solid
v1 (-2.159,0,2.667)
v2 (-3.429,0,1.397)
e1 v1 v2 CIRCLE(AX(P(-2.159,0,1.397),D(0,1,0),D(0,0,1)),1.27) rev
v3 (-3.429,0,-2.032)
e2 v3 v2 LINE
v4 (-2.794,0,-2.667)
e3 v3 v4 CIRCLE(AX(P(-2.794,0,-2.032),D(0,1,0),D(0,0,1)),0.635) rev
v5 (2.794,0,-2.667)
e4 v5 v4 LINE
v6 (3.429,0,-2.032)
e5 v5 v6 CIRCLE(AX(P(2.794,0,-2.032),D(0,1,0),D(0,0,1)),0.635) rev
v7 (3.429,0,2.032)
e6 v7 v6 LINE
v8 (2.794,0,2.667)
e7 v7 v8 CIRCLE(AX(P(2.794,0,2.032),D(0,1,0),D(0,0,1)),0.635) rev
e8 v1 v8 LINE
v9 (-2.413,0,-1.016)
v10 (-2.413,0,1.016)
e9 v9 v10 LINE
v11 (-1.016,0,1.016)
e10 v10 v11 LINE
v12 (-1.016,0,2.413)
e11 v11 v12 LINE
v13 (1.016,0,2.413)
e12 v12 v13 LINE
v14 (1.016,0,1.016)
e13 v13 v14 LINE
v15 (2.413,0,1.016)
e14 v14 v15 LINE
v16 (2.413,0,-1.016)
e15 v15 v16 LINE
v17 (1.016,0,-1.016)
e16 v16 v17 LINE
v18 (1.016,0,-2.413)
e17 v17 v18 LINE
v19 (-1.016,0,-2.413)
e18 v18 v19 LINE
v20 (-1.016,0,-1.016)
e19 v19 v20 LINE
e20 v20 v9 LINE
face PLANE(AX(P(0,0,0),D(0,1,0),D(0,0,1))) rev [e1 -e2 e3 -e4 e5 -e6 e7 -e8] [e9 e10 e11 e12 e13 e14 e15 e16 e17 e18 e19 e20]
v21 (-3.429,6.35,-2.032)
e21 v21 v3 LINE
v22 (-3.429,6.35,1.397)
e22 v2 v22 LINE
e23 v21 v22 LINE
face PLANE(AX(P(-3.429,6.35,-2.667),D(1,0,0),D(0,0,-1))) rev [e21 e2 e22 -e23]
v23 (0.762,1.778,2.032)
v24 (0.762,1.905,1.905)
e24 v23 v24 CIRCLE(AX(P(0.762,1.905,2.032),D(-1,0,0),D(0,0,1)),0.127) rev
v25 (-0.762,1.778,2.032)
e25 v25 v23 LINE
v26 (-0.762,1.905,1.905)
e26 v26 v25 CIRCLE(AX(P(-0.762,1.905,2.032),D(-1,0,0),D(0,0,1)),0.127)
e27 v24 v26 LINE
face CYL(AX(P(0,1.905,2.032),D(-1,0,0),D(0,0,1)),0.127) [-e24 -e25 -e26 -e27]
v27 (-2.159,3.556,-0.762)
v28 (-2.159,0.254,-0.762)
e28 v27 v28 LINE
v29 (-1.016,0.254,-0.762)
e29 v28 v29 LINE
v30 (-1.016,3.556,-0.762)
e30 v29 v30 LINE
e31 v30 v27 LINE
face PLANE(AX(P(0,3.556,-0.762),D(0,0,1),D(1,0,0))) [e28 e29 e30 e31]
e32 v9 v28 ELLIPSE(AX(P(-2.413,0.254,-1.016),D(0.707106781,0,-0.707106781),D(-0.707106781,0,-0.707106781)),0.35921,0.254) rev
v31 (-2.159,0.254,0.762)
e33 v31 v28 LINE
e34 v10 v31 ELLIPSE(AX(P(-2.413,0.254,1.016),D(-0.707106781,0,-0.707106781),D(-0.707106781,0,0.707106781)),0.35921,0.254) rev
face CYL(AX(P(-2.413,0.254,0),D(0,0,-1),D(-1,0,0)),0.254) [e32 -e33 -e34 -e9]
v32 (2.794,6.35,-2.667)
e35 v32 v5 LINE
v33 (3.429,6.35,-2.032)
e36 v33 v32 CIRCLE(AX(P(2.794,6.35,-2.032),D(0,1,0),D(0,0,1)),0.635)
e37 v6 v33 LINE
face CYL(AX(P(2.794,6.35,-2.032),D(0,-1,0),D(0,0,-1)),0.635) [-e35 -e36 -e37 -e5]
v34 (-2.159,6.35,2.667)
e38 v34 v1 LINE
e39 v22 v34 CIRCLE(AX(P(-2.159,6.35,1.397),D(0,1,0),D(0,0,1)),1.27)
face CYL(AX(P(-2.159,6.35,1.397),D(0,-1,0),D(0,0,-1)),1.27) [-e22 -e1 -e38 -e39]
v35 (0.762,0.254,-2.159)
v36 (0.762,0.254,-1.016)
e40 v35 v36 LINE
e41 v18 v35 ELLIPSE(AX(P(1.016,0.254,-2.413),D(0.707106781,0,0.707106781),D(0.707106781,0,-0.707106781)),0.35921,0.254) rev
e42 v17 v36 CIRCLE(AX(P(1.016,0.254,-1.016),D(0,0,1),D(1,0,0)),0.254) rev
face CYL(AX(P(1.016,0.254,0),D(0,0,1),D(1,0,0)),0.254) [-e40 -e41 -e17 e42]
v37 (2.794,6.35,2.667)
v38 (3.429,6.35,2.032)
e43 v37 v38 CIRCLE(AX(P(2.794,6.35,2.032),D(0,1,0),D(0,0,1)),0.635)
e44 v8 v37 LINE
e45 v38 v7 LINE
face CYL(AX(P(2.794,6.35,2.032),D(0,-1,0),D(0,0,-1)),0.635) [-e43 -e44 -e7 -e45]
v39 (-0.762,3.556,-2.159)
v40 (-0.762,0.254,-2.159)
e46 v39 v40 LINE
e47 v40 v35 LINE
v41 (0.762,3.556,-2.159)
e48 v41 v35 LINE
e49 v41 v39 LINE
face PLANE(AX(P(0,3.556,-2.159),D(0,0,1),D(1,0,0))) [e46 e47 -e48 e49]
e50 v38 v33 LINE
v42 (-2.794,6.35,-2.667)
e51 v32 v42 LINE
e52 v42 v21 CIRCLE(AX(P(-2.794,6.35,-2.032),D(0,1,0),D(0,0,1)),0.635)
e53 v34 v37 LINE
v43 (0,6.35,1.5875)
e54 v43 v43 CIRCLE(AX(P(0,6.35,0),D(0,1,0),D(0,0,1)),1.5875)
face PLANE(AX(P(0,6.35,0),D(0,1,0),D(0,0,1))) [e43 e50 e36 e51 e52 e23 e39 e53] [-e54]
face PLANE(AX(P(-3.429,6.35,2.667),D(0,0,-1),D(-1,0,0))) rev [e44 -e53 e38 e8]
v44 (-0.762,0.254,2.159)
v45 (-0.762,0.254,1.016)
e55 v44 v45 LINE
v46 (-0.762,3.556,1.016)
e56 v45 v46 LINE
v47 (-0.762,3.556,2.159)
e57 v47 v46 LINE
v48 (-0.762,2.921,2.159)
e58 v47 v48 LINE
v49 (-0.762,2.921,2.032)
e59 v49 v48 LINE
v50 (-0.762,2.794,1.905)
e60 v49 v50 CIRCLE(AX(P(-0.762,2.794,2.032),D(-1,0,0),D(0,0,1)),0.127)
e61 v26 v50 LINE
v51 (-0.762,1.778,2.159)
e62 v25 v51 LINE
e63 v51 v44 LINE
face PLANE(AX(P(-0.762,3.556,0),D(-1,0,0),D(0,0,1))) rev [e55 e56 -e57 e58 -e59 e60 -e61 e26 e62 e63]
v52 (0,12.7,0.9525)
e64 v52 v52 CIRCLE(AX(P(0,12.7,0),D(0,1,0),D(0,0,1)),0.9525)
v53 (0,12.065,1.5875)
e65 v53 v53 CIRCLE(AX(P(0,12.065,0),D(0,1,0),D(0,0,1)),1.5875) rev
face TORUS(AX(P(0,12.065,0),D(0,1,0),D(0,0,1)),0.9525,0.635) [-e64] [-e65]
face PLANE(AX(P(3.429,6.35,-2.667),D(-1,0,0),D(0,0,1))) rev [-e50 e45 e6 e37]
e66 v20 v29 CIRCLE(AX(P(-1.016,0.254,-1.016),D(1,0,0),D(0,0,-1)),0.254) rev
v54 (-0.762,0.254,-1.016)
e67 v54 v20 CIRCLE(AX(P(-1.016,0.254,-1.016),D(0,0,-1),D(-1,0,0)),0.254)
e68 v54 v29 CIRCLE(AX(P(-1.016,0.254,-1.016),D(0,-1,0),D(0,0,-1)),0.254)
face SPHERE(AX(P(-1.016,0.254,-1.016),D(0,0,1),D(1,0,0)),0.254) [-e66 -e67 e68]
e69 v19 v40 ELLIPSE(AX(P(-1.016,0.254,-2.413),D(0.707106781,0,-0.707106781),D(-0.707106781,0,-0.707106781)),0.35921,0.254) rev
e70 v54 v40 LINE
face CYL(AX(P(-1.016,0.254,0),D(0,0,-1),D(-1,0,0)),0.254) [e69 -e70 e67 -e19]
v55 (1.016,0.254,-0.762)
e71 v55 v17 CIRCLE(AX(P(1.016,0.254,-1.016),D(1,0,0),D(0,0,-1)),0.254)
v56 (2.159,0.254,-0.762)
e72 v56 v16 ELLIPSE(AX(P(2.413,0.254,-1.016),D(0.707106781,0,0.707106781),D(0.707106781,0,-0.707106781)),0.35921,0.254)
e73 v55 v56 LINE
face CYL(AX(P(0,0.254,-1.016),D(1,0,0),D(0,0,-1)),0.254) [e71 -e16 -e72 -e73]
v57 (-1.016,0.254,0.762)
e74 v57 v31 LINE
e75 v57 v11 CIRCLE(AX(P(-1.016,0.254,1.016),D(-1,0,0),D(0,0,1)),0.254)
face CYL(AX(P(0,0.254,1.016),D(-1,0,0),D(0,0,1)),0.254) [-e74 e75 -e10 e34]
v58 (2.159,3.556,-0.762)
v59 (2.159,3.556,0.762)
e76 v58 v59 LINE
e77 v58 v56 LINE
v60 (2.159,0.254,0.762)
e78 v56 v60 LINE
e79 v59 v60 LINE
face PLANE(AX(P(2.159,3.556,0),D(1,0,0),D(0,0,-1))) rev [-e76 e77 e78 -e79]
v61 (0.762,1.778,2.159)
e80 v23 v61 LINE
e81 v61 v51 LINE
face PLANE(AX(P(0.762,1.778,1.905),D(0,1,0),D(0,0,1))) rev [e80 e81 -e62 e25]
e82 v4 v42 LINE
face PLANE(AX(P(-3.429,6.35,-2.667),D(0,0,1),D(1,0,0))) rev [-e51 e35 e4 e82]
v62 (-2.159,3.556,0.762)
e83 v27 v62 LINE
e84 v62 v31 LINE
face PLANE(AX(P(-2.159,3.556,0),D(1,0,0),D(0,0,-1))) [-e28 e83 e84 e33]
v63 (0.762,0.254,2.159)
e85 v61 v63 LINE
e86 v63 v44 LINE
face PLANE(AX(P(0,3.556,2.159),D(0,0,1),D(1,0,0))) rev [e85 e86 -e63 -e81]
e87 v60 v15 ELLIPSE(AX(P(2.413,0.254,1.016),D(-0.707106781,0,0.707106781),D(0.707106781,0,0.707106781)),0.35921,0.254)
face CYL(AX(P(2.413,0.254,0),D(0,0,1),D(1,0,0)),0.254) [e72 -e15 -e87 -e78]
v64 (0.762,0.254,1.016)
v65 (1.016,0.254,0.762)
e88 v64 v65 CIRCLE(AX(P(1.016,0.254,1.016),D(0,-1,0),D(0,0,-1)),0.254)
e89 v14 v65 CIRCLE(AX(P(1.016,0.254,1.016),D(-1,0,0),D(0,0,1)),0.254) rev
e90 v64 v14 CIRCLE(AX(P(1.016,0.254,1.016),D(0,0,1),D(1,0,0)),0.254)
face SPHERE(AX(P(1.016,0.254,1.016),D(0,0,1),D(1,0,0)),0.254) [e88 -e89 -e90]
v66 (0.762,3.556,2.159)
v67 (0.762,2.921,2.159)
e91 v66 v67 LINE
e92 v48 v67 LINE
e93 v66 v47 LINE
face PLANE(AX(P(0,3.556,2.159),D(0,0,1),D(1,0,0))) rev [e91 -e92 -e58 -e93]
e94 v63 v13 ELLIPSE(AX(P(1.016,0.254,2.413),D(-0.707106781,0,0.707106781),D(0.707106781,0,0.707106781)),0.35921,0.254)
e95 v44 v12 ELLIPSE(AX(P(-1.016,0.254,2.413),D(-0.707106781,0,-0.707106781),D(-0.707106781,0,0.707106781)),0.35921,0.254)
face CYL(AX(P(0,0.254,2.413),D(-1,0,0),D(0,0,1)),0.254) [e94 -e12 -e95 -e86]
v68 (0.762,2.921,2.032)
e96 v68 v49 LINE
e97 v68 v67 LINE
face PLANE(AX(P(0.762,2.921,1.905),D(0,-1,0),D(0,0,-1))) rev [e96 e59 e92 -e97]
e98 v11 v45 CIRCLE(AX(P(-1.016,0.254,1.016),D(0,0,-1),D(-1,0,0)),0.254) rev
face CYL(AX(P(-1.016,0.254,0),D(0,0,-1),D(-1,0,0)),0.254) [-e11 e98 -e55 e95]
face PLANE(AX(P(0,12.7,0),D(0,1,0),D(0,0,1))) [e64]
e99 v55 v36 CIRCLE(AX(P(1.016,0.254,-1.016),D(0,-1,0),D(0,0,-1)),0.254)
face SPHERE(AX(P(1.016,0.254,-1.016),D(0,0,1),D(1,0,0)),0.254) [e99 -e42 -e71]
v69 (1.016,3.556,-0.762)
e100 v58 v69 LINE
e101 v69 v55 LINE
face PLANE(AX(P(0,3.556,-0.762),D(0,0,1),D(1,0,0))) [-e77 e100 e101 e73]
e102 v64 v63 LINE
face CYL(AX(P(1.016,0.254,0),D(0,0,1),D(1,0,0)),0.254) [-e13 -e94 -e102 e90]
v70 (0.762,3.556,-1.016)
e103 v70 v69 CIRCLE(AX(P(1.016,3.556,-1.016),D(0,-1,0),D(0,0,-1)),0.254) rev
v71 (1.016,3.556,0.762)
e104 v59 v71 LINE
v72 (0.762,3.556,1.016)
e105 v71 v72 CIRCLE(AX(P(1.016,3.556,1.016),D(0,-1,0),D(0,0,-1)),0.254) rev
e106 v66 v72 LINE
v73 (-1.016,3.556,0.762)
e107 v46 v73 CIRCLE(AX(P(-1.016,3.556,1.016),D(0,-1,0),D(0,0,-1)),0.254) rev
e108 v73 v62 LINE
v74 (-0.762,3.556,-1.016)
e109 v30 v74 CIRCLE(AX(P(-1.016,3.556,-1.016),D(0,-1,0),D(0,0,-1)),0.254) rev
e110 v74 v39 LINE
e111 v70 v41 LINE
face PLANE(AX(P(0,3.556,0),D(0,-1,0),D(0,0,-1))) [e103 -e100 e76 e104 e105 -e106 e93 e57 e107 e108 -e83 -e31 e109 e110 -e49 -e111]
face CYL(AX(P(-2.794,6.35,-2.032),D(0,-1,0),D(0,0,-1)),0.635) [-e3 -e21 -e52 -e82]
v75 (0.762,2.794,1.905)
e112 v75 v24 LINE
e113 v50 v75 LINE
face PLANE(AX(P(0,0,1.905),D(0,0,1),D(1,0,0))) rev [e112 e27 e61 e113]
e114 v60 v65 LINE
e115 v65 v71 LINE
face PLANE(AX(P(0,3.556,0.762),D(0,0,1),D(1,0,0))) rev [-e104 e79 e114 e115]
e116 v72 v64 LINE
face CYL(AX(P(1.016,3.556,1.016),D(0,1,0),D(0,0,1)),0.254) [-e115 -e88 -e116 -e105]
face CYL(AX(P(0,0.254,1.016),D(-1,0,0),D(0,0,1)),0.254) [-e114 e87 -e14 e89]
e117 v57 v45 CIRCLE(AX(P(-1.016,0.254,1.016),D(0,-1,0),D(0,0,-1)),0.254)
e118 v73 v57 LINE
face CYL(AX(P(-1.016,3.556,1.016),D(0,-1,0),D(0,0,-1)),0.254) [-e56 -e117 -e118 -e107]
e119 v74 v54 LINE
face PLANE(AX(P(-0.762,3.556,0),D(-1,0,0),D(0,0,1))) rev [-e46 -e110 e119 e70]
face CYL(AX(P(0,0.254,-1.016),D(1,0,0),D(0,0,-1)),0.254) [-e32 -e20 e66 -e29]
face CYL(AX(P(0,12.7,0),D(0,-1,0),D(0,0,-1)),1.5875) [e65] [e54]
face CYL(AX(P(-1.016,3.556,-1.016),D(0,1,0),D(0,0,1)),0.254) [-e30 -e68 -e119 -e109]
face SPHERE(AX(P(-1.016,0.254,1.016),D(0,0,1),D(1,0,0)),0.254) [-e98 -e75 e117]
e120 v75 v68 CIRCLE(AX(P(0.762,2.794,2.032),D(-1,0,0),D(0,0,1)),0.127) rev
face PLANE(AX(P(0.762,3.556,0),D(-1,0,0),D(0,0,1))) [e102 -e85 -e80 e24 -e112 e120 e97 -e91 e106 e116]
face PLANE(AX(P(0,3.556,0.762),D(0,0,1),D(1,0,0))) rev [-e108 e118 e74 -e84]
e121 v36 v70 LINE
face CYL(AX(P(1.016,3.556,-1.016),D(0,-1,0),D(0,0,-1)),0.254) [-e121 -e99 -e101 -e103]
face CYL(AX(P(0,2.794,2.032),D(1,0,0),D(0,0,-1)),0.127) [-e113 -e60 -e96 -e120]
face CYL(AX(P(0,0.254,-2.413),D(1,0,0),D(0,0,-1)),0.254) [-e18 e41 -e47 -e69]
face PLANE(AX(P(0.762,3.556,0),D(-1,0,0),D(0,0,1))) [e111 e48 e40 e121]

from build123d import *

# Parameters (mm, degrees)
SKETCH1_W           = 6.858
SKETCH1_H           = 5.334
BOSS_EXTRUDE1_DEPTH = 6.35
SKETCH4_W           = 1.397
SKETCH4_H           = 1.524
SKETCH4_W_2         = 1.524
SKETCH4_H_2         = 1.397
CUT_EXTRUDE1_DEPTH  = 3.556
SKETCH5_W           = 1.524
SKETCH5_H           = 1.143
BOSS_EXTRUDE4_DEPTH = 0.254
FILLET1_R           = 0.127
FILLET3_R           = 0.635
FILLET4_R           = 0.254
FILLET5_R           = 0.254
FILLET6_R           = 1.27
SKETCH6_R           = 1.5875
BOSS_EXTRUDE5_DEPTH = 6.35
FILLET8_R           = 0.635


with BuildPart() as part:
    # Sketch1 → Boss-Extrude1 (new body)
    with BuildSketch(Plane(origin=(0, 0, 0), x_dir=(1, 0, 0), z_dir=(0, 1, 0))):
        Rectangle(SKETCH1_W, SKETCH1_H)
    extrude(amount=BOSS_EXTRUDE1_DEPTH)

    # Sketch4 → Cut-Extrude1 (cut)
    with BuildSketch(Plane.XZ):
        with Locations((-1.4605, 0)):
            Rectangle(SKETCH4_W, SKETCH4_H)
        Rectangle(SKETCH4_W_2, SKETCH4_H)
        with Locations((1.4605, 0)):
            Rectangle(SKETCH4_W, SKETCH4_H)
        with Locations((0, -1.4605)):
            Rectangle(SKETCH4_W_2, SKETCH4_H_2)
        with Locations((0, 1.4605)):
            Rectangle(SKETCH4_W_2, SKETCH4_H_2)
    extrude(amount=-CUT_EXTRUDE1_DEPTH, mode=Mode.SUBTRACT)

    # Sketch5 → Boss-Extrude4 (add)
    with BuildSketch(Plane(origin=(0, 0, 2.159), x_dir=(-1, 0, 0), z_dir=(0, 0, -1))):
        with Locations((0, 2.3495)):
            Rectangle(SKETCH5_W, SKETCH5_H)
    extrude(amount=BOSS_EXTRUDE4_DEPTH)

    # Fillet1
    fillet1_edges = [part.edges().sort_by_distance(p)[0] for p in [
        (0, 1.778, 1.905),
        (0, 2.921, 1.905),
    ]]
    fillet(fillet1_edges, radius=FILLET1_R)

    # Fillet3
    fillet3_edges = [part.edges().sort_by_distance(p)[0] for p in [
        (3.429, 3.175, 2.667),
        (-3.429, 3.175, -2.667),
        (3.429, 3.175, -2.667),
    ]]
    fillet(fillet3_edges, radius=FILLET3_R)

    # Fillet4
    fillet4_edges = [part.edges().sort_by_distance(p)[0] for p in [
        (-1.4605, 0, -0.762),
        (-2.159, 0, 0),
        (0.762, 0, 1.4605),
        (1.4605, 0, -0.762),
        (0.762, 0, -1.4605),
        (0, 0, -2.159),
        (-0.762, 0, -1.4605),
        (2.159, 0, 0),
        (1.4605, 0, 0.762),
        (0, 0, 2.159),
        (-0.762, 0, 1.4605),
        (-1.4605, 0, 0.762),
    ]]
    fillet(fillet4_edges, radius=FILLET4_R)

    # Fillet5
    # the kernel refuses this fillet: 0.254 mm, written as the material it takes off along each edge
    with BuildSketch(Plane(origin=(1.016, 0.254, -1.016), x_dir=(0, 0, 1), z_dir=(-1, 0, 0))) as fillet5_piece_1_section:
        Polygon((0, 0), (FILLET5_R, 0), (FILLET5_R, -FILLET5_R), (0, -FILLET5_R), align=None)
    fillet5_piece_1 = extrude(amount=FILLET5_R, mode=Mode.PRIVATE)
    fillet5_piece_1 = fillet5_piece_1 - Plane(origin=(1.016, 0.254, -1.016), x_dir=(0, 0.7071067811865475, -0.7071067811865475), z_dir=(-1, 0, 0)) * Sphere(FILLET5_R, mode=Mode.PRIVATE)
    add(fillet5_piece_1, mode=Mode.SUBTRACT)
    with BuildSketch(Plane(origin=(1.016, 0.254, 1.016), x_dir=(0, 0, -1), z_dir=(-1, 0, 0))) as fillet5_piece_2_section:
        Polygon((0, 0), (FILLET5_R, 0), (FILLET5_R, FILLET5_R), (0, FILLET5_R), align=None)
    fillet5_piece_2 = extrude(amount=FILLET5_R, mode=Mode.PRIVATE)
    fillet5_piece_2 = fillet5_piece_2 - Plane(origin=(1.016, 0.254, 1.016), x_dir=(0, 0.7071067811865475, 0.7071067811865475), z_dir=(-1, 0, 0)) * Sphere(FILLET5_R, mode=Mode.PRIVATE)
    add(fillet5_piece_2, mode=Mode.SUBTRACT)
    with BuildSketch(Plane(origin=(-1.016, 0.254, -1.016), x_dir=(1, 0, 0), z_dir=(0, 0, 1))) as fillet5_piece_3_section:
        Polygon((0, 0), (FILLET5_R, 0), (FILLET5_R, -FILLET5_R), (0, -FILLET5_R), align=None)
    fillet5_piece_3 = extrude(amount=FILLET5_R, mode=Mode.PRIVATE)
    fillet5_piece_3 = fillet5_piece_3 - Plane(origin=(-1.016, 0.254, -1.016), x_dir=(-0.7071067811865475, 0.7071067811865475, 0), z_dir=(0, 0, 1)) * Sphere(FILLET5_R, mode=Mode.PRIVATE)
    add(fillet5_piece_3, mode=Mode.SUBTRACT)
    with BuildSketch(Plane(origin=(-1.016, 0.254, 1.016), x_dir=(1, 0, 0), z_dir=(0, 0, -1))) as fillet5_piece_4_section:
        Polygon((0, 0), (FILLET5_R, 0), (FILLET5_R, FILLET5_R), (0, FILLET5_R), align=None)
    fillet5_piece_4 = extrude(amount=FILLET5_R, mode=Mode.PRIVATE)
    fillet5_piece_4 = fillet5_piece_4 - Plane(origin=(-1.016, 0.254, 1.016), x_dir=(-0.7071067811865475, 0.7071067811865475, 0), z_dir=(0, 0, -1)) * Sphere(FILLET5_R, mode=Mode.PRIVATE)
    add(fillet5_piece_4, mode=Mode.SUBTRACT)
    with BuildSketch(Plane(origin=(-0.762, 0.254, -0.762), x_dir=(-1, 0, 0), z_dir=(0, 1, 0)), Plane(origin=(0.762, 0.254, -0.762), x_dir=(0, 0, -1), z_dir=(0, 1, 0))) as fillet5_piece_5:
        with BuildLine():
            CenterArc((FILLET5_R, -FILLET5_R), FILLET5_R, 90, 90)
            Line((0, -FILLET5_R), (0, 0))
            Line((0, 0), (FILLET5_R, 0))
        make_face()
    extrude(amount=3.302, mode=Mode.SUBTRACT)
    with BuildSketch(Plane(origin=(-0.762, 0.254, 0.762), x_dir=(-1, 0, 0), z_dir=(0, 1, 0)), Plane(origin=(0.762, 0.254, 0.762), x_dir=(0, 0, 1), z_dir=(0, 1, 0))) as fillet5_piece_6:
        with BuildLine():
            CenterArc((FILLET5_R, FILLET5_R), FILLET5_R, 180, 90)
            Line((0, FILLET5_R), (0, 0))
            Line((0, 0), (FILLET5_R, 0))
        make_face()
    extrude(amount=3.302, mode=Mode.SUBTRACT)

    # Fillet6
    fillet6_edges = [part.edges().sort_by_distance(p)[0] for p in [
        (-3.429, 3.175, 2.667),
    ]]
    fillet(fillet6_edges, radius=FILLET6_R)

    # Sketch6 → Boss-Extrude5 (add)
    with BuildSketch(Plane(origin=(0, 6.35, 0), x_dir=(1, 0, 0), z_dir=(0, 1, 0))):
        with Locations(Location((0, 0, 0), (0, 0, 270))):
            Circle(SKETCH6_R)
    extrude(amount=BOSS_EXTRUDE5_DEPTH)

    # Fillet8
    fillet8_edges = [part.edges().sort_by_distance(p)[0] for p in [
        (0, 12.7, -1.5875),
    ]]
    fillet(fillet8_edges, radius=FILLET8_R)


solid = part.part
